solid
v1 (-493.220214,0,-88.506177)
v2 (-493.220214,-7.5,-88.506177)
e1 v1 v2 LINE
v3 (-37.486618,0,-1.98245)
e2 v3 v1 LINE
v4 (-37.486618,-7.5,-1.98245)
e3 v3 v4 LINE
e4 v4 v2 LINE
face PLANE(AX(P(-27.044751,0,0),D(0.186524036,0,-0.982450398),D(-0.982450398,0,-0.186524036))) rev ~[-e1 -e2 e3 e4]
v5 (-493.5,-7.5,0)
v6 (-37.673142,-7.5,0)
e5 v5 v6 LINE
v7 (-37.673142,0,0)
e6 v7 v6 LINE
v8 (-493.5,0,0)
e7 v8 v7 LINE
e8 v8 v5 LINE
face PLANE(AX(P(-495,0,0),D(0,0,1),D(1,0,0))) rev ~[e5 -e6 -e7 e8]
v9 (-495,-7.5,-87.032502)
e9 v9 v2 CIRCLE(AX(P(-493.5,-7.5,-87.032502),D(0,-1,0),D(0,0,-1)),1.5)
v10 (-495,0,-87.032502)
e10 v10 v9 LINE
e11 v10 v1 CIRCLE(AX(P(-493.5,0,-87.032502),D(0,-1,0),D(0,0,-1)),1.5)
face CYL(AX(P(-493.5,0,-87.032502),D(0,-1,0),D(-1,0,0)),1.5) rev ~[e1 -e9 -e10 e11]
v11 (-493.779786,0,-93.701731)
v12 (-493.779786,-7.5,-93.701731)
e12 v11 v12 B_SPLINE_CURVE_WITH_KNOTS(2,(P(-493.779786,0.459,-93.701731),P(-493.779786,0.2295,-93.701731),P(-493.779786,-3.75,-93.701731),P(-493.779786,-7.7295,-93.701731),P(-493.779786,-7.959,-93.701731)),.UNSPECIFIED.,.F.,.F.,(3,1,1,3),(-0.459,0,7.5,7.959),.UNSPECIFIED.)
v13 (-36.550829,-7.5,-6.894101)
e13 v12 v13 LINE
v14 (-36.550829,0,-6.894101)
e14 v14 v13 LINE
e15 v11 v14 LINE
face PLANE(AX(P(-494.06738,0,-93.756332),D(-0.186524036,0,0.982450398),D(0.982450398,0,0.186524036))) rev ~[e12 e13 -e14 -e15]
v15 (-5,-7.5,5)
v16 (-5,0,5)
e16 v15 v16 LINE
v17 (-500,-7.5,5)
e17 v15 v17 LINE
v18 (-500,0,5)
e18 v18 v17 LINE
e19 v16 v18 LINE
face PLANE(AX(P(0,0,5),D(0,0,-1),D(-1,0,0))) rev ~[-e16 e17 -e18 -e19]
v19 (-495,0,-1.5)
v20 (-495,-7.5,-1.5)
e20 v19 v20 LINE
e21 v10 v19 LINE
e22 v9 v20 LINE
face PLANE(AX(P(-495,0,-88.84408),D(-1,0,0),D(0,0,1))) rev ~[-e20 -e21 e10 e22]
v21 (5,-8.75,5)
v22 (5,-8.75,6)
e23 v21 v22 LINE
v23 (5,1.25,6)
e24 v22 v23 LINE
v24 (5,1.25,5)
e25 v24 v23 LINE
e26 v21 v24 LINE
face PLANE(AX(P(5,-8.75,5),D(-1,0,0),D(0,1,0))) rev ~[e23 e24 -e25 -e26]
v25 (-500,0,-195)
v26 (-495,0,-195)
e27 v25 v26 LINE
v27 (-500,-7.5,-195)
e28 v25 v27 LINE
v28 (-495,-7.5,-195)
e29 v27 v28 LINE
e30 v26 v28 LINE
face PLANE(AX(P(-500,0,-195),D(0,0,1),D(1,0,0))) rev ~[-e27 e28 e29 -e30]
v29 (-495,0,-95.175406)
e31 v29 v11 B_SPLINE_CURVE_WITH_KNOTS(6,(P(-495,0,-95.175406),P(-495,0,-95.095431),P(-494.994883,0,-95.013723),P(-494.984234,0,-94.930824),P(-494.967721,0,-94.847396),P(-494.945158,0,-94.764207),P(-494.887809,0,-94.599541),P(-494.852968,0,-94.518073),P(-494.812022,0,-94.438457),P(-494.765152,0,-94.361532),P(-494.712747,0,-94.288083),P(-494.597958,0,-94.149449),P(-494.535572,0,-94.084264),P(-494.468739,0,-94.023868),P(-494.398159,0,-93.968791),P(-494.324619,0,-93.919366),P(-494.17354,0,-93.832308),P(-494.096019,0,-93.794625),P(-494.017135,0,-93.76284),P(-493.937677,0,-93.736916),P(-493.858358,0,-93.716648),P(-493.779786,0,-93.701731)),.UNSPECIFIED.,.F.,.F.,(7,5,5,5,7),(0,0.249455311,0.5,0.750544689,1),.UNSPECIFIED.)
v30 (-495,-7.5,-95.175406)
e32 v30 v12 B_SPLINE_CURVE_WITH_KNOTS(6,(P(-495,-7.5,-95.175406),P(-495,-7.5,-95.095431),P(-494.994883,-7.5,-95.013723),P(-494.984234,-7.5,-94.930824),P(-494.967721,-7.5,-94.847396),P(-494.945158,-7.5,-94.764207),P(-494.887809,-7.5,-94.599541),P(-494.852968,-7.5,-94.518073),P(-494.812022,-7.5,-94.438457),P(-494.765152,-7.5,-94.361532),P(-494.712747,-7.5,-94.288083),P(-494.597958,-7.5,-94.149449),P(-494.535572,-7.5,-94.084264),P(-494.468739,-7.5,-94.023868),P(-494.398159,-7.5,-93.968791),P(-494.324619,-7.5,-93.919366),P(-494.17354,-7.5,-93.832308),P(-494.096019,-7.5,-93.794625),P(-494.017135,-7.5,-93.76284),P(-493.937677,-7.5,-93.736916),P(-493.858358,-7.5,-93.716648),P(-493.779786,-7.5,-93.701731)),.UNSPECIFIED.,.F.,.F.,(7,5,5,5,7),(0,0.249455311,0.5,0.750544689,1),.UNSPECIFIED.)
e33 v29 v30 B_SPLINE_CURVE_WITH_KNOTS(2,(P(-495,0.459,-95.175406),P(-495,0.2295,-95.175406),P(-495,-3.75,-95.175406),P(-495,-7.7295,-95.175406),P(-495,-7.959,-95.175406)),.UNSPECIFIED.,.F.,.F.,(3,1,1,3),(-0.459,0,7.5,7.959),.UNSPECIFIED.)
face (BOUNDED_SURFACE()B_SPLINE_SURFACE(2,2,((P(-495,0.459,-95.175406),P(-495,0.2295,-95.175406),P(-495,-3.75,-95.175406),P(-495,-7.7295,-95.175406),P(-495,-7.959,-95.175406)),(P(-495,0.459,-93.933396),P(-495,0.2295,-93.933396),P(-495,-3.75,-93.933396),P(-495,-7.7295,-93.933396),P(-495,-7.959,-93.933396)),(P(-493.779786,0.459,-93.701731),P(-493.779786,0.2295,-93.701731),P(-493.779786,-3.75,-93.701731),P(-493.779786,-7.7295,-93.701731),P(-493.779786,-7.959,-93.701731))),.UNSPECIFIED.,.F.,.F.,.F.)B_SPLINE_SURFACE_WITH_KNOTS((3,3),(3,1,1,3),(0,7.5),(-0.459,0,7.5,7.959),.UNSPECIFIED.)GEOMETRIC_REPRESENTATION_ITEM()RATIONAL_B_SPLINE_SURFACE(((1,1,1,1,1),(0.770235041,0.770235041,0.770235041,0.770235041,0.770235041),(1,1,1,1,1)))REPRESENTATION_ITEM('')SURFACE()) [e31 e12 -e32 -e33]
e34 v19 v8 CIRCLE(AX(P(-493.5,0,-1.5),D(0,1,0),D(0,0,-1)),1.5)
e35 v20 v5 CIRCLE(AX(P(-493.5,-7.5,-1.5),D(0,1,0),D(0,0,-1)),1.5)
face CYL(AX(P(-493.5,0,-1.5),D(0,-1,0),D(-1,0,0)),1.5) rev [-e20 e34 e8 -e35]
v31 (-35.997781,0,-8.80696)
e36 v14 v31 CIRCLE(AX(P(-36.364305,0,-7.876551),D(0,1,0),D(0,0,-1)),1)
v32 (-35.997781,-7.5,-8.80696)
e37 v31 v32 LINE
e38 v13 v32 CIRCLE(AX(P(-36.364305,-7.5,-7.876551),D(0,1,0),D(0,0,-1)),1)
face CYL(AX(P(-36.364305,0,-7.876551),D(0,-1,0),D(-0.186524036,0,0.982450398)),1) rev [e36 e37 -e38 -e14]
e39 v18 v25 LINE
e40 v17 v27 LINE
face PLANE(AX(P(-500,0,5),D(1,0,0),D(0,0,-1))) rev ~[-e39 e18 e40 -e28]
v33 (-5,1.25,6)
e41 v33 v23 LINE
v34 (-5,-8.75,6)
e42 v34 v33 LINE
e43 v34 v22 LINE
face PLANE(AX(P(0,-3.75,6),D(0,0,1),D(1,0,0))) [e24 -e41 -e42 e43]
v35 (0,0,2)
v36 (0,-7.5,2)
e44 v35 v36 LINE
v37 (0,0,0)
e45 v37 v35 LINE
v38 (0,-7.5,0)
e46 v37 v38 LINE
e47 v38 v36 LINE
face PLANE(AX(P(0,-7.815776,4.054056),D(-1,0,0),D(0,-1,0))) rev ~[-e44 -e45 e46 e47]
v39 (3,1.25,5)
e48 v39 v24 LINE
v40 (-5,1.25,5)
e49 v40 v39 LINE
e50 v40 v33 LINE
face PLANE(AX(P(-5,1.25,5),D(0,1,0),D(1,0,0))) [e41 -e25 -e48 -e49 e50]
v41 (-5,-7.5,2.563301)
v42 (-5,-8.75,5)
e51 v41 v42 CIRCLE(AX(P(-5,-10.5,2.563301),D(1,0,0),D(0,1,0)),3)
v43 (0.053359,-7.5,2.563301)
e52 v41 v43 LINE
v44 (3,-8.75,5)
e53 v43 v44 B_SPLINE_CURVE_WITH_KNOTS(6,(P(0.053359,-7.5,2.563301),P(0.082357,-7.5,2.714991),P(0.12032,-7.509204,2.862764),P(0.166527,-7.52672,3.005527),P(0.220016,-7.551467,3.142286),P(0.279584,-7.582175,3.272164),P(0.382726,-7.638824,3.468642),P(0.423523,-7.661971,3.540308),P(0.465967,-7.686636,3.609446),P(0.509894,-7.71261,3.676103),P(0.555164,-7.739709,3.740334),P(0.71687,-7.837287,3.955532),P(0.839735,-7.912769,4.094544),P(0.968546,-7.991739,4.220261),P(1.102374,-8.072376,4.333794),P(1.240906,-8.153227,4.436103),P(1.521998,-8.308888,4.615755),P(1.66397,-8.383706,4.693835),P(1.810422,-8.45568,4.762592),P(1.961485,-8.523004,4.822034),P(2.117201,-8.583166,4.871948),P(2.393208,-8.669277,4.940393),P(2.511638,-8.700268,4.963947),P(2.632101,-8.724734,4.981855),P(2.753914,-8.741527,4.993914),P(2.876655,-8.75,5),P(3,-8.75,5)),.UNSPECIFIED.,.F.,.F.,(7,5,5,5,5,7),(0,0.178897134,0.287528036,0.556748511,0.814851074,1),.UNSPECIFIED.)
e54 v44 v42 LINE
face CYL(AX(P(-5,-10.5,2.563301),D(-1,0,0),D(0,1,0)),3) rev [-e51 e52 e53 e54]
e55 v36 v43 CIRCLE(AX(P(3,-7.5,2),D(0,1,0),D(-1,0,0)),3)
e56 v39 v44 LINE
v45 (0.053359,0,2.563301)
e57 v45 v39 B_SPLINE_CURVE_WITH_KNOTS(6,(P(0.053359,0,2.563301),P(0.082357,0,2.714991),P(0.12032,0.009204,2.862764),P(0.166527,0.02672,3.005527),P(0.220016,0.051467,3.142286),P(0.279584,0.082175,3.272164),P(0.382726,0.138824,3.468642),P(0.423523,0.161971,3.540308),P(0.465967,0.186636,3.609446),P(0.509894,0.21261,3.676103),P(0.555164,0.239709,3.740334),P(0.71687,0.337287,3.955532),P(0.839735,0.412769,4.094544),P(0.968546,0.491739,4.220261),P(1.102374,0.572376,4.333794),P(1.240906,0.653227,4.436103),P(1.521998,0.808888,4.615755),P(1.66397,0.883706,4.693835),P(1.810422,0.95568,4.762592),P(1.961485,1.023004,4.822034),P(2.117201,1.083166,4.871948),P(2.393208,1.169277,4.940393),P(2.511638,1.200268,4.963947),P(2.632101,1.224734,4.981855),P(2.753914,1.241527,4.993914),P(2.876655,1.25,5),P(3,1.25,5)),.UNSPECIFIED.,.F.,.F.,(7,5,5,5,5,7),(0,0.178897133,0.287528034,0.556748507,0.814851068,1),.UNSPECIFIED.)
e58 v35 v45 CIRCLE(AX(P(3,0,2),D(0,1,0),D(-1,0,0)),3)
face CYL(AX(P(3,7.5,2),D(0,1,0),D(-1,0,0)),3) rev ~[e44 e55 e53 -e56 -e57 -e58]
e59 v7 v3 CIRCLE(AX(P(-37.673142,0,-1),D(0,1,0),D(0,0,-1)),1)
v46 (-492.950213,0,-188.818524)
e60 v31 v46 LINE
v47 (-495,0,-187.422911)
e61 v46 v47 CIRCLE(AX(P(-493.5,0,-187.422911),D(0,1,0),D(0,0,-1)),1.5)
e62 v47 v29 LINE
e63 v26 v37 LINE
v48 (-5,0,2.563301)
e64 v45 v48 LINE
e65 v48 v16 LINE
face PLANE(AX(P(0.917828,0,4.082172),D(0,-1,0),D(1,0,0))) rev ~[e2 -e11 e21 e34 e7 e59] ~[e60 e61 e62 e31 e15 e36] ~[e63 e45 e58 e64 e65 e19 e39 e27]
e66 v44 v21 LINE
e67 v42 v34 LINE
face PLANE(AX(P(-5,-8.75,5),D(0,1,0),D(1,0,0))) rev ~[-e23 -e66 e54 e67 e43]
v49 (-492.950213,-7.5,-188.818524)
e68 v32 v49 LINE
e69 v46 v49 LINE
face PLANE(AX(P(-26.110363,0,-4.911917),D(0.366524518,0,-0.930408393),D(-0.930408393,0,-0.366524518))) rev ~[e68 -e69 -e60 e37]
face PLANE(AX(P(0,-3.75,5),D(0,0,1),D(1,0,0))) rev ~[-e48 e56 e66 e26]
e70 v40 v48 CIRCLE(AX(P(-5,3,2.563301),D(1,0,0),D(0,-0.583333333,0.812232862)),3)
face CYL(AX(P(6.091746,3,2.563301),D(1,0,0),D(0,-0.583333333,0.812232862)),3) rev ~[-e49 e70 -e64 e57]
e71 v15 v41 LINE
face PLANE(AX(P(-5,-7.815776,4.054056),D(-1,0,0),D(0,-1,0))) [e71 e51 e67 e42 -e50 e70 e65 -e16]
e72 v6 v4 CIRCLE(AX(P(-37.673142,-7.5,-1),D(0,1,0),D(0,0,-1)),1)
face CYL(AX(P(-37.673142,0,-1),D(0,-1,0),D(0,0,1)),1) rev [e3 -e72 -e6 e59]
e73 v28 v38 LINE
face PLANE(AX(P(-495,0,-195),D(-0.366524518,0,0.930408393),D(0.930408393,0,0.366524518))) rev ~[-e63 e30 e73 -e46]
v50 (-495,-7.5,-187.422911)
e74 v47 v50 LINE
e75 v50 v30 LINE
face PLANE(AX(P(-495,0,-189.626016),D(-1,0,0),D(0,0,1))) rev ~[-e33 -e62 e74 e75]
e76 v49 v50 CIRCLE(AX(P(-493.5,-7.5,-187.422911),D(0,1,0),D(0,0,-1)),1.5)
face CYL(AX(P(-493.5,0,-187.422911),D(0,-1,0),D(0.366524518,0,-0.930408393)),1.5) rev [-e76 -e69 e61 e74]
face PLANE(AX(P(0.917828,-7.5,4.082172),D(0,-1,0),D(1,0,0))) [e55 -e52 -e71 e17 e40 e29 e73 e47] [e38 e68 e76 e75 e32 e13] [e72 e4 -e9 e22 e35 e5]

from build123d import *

# Parameters (mm, degrees)
F1_DEPTH     = 7.5
F2_R         = 1.5
F3_R         = 1.5
F4_F1_R      = 1
F4_F2_R      = 1
F5_W         = 10
F5_H         = 10
F6_DEPTH     = 1
F7_T1_DEPTH  = 5
F7_T3_DEPTH  = 7.5
F7_T9_DEPTH  = 11.0917464655
F7_T14_DEPTH = 15
F7_T22_DEPTH = 15
F7_T27_DEPTH = 11.0917464655


# Not quite as in the source:
# - a fillet or chamfer that OpenCascade refuses, or shapes differently, is made with other operations: its cross-section is extruded or revolved along the edge and cut away or added


with BuildPart() as f1:
    # F0 (on Front) → F1 (new body)
    with BuildSketch(Plane.XZ):
        Polygon((0, 0), (0, 5), (-14.5909318536, 5), (-495, 5), (-500, 5), (-500, 0), (-500, -195), (-495, -195), (-408.1860127931, -160.8005504943), align=None)
        Polygon((-26.1103633187, -4.911916504), (-410.018635385, -156.1485085302), (-495, -189.6260158027), (-495, -142.4539996661), (-495, -95.2819835295), (-495, -93.9333955313), (-494.06737982, -93.7563320577), align=None, mode=Mode.SUBTRACT)
        Polygon((-495, 0), (-27.044750547, 0), (-495, -88.8440800691), (-495, -44.4220400346), align=None, mode=Mode.SUBTRACT)
    extrude(amount=F1_DEPTH)

    # F2
    f2_edges = [f1.edges().sort_by_distance(p)[0] for p in [
        (-495, -3.75, -88.84408),
    ]]
    fillet(f2_edges, radius=F2_R)

    # F3
    f3_edges = [f1.edges().sort_by_distance(p)[0] for p in [
        (-495, -3.75, -93.933396),
        (-495, -3.75, 0),
        (-495, -3.75, -189.626016),
    ]]
    fillet(f3_edges, radius=F3_R)

    # F4: fillet of radius 1 on 2 edges, made by hand

    # F4_f1
    f4_f1_edges = [f1.edges().sort_by_distance(p)[0] for p in [
        (-27.044750547, -3.75, 0),
    ]]
    fillet(f4_f1_edges, radius=F4_F1_R)

    # F4_f2
    f4_f2_edges = [f1.edges().sort_by_distance(p)[0] for p in [
        (-26.1103633187, -3.75, -4.911916504),
    ]]
    fillet(f4_f2_edges, radius=F4_F2_R)

    # F5 (on face) → F6 (join)
    with BuildSketch(Plane.XY.offset(5)):
        with Locations((0, -3.75)):
            Rectangle(F5_W, F5_H)
    extrude(amount=F6_DEPTH)

    # F7: fillet of radius 3 on 3 edges, made by hand

    # F7_s2 → F7_t1 (join)
    with BuildSketch(Plane.YZ.offset(-5)):
        with BuildLine():
            ThreePointArc((-7.5, 2.5633014138), (-7.830730437, 3.9326078076), (-8.75, 5))
            Line((-8.75, 5), (-7.5, 5))
            Line((-7.5, 5), (-7.5, 2.5633014138))
        make_face()
        with BuildLine():
            ThreePointArc((1.25, 5), (0.330730437, 3.9326078076), (0, 2.5633014138))
            Line((0, 2.5633014138), (0, 5))
            Line((0, 5), (1.25, 5))
        make_face()
    extrude(amount=F7_T1_DEPTH)

    # F7_s4 → F7_t3 (join)
    with BuildSketch(Plane.XZ):
        with BuildLine():
            ThreePointArc((0, 2), (0.8786796564, 4.1213203436), (3, 5))
            Line((3, 5), (0, 5))
            Line((0, 5), (0, 2))
        make_face()
    extrude(amount=F7_T3_DEPTH)


with BuildPart() as f7_tool7:
    # F7_s8 → F7_t9 (new body)
    with BuildSketch(Plane.YZ.offset(-5)):
        with BuildLine():
            ThreePointArc((-7.5, 2.5633014138), (-7.830730437, 3.9326078076), (-8.75, 5))
            Line((-8.75, 5), (-7.5, 5))
            Line((-7.5, 5), (-7.5, 2.5633014138))
        make_face()
    extrude(amount=F7_T9_DEPTH)

    split(bisect_by=Plane.YZ, keep=Keep.TOP)

    split(bisect_by=Plane.YZ.offset(5), keep=Keep.BOTTOM)


with BuildPart() as f7_tool12:
    # F7_s13 → F7_t14 (new body)
    with BuildSketch(Plane.XZ):
        with BuildLine():
            ThreePointArc((0, 2), (0.8786796564, 4.1213203436), (3, 5))
            Line((3, 5), (0, 5))
            Line((0, 5), (0, 2))
        make_face()
    extrude(amount=F7_T14_DEPTH)

    split(bisect_by=Plane.XZ.offset(7.5), keep=Keep.TOP)

    split(bisect_by=Plane.XZ.offset(8.75), keep=Keep.BOTTOM)


with BuildPart() as f7_tool7_1:
    add(f7_tool7.part)

    # F7_t17: intersect F7_tool12
    add(f7_tool12.part, mode=Mode.INTERSECT)


with BuildPart() as f1_1:
    add(f1.part)

    # F7_t5: union F7_tool7
    add(f7_tool7_1.part)


with BuildPart() as f7_tool20:
    # F7_s21 → F7_t22 (new body)
    with BuildSketch(Plane.XZ.offset(-7.5)):
        with BuildLine():
            ThreePointArc((0, 2), (0.8786796564, 4.1213203436), (3, 5))
            Line((3, 5), (0, 5))
            Line((0, 5), (0, 2))
        make_face()
    extrude(amount=F7_T22_DEPTH)

    split(bisect_by=Plane.XZ, keep=Keep.BOTTOM)

    split(bisect_by=Plane.XZ.offset(-1.25), keep=Keep.TOP)


with BuildPart() as f7_tool25:
    # F7_s26 → F7_t27 (new body)
    with BuildSketch(Plane.YZ.offset(6.0917464655)):
        with BuildLine():
            ThreePointArc((1.25, 5), (0.330730437, 3.9326078076), (0, 2.5633014138))
            Line((0, 2.5633014138), (0, 5))
            Line((0, 5), (1.25, 5))
        make_face()
    extrude(amount=-F7_T27_DEPTH)

    split(bisect_by=Plane.YZ, keep=Keep.TOP)

    split(bisect_by=Plane.YZ.offset(5), keep=Keep.BOTTOM)


with BuildPart() as f7_tool20_1:
    add(f7_tool20.part)

    # F7_t30: intersect F7_tool25
    add(f7_tool25.part, mode=Mode.INTERSECT)


with BuildPart() as f1_2:
    add(f1_1.part)

    # F7_t18: union F7_tool20
    add(f7_tool20_1.part)


solid = f1_2.part
